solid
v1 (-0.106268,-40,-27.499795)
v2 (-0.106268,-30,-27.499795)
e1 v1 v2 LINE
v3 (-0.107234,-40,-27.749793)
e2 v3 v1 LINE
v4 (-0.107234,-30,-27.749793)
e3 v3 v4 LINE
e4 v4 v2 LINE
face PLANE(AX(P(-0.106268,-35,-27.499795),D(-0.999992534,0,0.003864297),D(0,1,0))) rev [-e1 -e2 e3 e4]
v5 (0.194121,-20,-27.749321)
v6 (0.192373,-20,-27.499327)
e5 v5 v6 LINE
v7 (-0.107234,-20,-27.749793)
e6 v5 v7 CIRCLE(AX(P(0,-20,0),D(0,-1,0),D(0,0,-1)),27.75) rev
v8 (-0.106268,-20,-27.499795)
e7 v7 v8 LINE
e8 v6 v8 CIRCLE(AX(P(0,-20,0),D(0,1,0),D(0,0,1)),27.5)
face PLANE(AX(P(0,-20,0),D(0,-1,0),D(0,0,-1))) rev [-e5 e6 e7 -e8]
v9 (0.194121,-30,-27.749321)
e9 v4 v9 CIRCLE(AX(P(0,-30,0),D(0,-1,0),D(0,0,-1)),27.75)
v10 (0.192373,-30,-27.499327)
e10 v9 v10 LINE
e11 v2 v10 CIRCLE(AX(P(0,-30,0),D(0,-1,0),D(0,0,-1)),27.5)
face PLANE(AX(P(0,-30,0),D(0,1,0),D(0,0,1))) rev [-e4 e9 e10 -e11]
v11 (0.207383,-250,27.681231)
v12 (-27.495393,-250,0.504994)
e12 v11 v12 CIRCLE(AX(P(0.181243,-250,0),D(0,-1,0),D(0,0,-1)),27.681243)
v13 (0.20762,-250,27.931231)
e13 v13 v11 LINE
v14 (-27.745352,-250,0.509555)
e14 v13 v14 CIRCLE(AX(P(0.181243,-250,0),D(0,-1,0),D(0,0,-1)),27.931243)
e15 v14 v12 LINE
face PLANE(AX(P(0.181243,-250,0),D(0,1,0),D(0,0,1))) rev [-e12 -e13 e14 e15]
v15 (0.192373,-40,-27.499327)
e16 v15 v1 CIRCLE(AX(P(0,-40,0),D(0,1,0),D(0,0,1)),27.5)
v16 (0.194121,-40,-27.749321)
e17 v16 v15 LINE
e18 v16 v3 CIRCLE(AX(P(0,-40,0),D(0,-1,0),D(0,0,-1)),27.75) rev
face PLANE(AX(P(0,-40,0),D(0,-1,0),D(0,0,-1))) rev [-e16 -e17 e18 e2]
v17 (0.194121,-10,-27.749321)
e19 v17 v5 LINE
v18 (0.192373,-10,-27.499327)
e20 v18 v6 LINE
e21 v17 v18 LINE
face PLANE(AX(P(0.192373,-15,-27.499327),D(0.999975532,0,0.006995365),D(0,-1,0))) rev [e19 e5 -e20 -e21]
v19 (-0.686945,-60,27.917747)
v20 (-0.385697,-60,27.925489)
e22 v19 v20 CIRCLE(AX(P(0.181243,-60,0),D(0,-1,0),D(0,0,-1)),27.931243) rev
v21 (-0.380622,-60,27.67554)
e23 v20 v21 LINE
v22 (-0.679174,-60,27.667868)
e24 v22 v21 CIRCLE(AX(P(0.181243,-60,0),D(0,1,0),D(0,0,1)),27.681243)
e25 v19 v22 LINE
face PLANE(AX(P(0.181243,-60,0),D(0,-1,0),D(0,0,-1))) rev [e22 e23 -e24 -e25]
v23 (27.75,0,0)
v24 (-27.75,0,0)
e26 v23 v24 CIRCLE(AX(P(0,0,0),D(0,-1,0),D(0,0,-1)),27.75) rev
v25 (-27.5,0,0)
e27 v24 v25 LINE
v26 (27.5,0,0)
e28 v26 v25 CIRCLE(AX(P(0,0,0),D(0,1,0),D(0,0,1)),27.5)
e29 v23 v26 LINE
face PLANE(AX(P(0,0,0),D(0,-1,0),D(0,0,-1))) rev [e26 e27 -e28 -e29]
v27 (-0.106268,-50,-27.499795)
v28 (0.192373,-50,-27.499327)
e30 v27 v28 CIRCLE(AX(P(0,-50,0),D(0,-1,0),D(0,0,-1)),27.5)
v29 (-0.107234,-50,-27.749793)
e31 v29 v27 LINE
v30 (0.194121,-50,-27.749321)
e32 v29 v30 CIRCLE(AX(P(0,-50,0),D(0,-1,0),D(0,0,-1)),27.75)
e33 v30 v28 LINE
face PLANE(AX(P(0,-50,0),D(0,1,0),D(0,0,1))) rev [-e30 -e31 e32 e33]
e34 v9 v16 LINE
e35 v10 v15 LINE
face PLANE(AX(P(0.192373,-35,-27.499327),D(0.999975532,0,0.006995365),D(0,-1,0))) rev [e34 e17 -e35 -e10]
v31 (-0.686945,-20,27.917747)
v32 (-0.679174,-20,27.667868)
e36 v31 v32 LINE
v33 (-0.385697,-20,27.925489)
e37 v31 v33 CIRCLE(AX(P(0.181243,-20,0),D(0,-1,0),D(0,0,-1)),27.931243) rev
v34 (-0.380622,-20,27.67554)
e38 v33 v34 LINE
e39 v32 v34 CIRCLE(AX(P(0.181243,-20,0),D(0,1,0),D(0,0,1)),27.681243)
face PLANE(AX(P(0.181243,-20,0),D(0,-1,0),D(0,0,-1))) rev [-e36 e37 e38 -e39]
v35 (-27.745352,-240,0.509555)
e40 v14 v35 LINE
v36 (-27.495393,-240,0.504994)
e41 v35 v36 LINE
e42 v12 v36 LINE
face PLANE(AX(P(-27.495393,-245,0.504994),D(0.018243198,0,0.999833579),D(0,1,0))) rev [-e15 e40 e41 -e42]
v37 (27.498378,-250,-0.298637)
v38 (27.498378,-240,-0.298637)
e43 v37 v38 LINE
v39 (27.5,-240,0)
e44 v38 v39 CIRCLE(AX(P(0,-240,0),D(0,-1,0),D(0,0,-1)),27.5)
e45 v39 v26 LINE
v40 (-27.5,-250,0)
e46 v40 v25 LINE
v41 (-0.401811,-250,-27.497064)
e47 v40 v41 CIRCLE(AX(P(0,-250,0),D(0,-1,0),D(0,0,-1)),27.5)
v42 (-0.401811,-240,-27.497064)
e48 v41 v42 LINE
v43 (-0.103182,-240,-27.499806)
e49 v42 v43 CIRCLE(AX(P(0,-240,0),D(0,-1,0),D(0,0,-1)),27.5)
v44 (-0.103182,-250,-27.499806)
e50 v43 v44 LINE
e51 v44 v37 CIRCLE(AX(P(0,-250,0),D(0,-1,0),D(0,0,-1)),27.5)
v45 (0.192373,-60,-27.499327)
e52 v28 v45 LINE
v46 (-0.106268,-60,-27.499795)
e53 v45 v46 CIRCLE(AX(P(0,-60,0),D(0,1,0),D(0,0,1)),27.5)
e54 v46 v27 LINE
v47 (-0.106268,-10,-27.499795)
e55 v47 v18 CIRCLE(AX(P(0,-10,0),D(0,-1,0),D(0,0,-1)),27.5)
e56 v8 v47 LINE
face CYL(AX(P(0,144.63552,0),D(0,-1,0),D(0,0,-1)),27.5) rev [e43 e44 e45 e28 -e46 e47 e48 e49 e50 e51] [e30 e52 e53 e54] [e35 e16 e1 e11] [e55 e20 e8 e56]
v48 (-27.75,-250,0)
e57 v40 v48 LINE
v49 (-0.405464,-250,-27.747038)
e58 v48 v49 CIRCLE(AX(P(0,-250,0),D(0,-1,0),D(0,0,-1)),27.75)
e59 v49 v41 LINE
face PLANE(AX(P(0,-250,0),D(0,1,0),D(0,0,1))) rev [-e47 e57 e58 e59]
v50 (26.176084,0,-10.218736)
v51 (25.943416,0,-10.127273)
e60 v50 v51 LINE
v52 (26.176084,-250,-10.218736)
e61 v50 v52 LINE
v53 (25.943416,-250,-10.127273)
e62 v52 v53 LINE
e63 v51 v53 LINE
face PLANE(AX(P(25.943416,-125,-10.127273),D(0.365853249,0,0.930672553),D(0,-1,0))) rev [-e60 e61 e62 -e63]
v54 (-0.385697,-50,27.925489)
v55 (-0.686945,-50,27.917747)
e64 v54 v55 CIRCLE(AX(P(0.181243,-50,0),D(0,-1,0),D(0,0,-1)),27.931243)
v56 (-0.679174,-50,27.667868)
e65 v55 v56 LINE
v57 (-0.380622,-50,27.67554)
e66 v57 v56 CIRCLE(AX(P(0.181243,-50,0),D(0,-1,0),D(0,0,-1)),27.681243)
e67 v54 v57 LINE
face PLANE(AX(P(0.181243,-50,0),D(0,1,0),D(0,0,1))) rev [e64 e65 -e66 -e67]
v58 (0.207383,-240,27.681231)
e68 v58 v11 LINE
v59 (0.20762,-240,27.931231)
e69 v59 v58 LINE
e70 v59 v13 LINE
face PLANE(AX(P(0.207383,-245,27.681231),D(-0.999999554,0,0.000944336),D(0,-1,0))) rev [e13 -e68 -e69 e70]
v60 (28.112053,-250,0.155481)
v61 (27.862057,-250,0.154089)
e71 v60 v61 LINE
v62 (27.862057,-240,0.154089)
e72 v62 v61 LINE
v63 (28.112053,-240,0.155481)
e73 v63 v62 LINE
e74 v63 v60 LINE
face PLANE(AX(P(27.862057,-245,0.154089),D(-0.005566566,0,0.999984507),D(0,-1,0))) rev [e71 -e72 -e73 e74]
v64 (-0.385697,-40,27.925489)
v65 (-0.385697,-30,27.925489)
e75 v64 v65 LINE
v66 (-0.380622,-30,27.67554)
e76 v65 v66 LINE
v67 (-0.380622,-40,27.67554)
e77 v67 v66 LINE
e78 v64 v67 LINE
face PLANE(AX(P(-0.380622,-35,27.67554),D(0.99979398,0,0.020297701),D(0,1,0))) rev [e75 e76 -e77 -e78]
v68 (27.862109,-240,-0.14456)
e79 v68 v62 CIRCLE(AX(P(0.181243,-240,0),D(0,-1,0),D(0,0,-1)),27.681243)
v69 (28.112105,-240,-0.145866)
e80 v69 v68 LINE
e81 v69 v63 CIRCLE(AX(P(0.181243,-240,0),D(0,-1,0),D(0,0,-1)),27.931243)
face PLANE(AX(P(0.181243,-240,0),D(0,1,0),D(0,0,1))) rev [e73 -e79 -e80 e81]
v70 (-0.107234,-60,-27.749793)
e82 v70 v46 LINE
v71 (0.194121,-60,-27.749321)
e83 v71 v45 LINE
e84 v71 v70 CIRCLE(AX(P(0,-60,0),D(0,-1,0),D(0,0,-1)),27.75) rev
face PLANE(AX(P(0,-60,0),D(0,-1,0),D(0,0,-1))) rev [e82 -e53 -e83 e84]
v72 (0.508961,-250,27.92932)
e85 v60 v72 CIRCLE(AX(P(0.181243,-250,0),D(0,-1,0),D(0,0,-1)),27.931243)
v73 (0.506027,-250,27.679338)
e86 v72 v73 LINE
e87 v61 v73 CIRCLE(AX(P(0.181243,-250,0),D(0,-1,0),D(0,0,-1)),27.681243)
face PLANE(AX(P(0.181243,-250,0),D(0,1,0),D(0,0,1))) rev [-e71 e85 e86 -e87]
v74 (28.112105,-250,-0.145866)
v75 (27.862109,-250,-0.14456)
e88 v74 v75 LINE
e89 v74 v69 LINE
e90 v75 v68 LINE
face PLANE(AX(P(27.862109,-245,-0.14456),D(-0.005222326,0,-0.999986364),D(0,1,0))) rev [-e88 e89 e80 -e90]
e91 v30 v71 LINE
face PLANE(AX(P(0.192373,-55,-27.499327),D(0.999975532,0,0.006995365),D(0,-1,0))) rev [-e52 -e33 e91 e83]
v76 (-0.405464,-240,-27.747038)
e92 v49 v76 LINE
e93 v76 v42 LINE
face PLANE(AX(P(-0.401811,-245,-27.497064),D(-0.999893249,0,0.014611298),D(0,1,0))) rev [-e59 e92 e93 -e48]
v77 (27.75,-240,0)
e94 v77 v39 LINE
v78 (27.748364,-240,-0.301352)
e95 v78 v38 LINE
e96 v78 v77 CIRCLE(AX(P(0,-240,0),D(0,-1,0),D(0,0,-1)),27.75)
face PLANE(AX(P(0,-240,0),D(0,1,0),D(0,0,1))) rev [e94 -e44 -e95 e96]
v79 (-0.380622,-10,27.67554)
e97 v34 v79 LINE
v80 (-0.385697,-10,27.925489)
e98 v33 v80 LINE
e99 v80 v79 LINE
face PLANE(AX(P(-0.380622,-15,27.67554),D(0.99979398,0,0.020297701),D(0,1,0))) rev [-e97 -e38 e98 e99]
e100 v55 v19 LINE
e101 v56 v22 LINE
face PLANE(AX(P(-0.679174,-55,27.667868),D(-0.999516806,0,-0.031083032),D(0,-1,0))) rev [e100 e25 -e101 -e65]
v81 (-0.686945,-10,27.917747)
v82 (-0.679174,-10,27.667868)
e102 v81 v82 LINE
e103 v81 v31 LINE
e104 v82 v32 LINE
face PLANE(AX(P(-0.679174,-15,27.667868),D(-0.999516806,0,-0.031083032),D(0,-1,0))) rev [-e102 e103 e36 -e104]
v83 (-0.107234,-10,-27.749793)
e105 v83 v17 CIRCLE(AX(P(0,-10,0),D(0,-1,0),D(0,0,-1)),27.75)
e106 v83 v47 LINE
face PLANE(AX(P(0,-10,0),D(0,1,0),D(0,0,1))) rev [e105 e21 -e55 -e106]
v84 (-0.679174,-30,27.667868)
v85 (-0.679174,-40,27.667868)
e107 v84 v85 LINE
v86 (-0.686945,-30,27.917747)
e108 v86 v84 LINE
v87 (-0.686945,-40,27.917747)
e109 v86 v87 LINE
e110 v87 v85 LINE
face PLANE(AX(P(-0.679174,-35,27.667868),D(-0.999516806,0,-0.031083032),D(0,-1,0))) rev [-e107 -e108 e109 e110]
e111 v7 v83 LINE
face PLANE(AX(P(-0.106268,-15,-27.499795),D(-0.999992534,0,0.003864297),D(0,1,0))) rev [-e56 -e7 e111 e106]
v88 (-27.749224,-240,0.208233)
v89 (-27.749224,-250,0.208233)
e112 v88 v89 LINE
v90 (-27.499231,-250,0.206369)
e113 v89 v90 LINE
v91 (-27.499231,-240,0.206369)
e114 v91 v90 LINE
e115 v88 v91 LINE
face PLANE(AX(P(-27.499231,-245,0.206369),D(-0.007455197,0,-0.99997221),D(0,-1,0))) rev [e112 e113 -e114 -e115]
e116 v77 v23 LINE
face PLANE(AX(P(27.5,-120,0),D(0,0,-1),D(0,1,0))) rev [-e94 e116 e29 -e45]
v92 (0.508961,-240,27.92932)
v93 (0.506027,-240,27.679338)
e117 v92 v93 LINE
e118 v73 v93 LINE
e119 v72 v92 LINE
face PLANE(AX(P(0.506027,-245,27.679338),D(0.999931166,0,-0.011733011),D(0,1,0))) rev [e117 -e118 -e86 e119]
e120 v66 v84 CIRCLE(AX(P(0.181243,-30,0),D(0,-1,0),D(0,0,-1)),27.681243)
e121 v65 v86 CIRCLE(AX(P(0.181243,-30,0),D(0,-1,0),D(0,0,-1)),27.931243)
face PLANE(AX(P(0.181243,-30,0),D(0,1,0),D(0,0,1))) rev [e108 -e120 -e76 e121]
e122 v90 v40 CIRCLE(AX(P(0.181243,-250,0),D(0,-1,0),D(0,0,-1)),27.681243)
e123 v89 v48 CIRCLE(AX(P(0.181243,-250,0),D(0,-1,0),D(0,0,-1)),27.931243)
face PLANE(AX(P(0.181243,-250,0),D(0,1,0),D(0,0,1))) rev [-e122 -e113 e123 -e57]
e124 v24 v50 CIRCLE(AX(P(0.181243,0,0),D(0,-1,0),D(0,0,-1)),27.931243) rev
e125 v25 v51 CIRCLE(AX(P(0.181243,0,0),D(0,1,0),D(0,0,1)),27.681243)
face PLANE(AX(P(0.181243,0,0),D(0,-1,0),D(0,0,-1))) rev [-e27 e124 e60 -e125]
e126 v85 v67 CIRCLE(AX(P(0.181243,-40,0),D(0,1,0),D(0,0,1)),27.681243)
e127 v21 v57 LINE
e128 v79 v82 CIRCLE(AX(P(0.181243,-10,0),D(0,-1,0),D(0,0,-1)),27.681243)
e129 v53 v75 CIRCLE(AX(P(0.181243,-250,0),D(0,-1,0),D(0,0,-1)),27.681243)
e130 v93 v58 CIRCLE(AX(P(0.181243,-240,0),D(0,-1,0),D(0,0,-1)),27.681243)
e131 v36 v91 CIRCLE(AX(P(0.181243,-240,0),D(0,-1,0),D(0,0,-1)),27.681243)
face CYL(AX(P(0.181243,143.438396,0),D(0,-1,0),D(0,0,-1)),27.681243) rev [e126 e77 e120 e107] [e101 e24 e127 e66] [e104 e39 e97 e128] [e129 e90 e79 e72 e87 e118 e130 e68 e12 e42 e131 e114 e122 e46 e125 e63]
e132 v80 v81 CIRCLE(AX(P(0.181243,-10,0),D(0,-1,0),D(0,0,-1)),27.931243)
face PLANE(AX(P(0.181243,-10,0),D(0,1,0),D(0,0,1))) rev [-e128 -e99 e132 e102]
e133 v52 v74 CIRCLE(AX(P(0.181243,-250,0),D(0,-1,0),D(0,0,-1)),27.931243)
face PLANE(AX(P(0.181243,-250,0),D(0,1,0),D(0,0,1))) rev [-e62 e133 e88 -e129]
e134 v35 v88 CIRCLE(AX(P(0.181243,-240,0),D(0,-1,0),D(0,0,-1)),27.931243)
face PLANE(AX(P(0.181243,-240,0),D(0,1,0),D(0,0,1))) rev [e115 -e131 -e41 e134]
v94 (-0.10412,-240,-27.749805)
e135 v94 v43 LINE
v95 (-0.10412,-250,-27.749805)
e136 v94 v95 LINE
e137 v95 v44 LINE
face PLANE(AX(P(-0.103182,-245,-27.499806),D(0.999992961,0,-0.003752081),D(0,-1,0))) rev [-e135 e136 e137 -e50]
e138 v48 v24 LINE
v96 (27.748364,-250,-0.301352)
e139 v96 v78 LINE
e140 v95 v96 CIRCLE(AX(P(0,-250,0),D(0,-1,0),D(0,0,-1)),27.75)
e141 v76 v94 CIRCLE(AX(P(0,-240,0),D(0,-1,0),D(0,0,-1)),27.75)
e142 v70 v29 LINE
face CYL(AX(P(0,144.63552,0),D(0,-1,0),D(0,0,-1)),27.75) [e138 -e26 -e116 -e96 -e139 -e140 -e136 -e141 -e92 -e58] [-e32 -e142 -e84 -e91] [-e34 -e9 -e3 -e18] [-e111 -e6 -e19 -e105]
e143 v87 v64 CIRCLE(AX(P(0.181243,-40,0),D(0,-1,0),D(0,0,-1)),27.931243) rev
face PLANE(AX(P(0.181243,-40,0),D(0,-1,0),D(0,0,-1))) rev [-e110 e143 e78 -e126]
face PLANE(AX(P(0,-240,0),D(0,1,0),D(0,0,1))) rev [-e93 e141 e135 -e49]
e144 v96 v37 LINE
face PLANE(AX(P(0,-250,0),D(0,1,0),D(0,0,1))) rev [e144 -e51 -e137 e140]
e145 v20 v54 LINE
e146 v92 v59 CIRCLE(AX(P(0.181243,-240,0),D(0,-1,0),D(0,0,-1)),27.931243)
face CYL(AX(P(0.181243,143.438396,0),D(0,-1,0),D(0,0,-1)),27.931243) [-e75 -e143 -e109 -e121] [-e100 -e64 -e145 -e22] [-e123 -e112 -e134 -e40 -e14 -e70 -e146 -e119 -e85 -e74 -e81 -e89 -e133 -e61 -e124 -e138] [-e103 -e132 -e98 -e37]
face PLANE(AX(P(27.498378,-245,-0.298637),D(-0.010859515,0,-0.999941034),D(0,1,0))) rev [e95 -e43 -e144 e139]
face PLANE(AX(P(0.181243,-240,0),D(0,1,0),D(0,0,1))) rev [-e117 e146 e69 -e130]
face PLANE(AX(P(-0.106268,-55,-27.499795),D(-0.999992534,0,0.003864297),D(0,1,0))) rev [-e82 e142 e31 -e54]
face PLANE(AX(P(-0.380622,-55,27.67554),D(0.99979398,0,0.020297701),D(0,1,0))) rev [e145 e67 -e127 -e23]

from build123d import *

# Parameters (mm, degrees)
BASE_FLANGE1_DEPTH   = 250
UNFOLD1_START        = -250
UNFOLD1_DEPTH        = 250
UNFOLD1_2_DEPTH      = 250
SKETCH6_W            = 0.3
SKETCH6_H            = 10
CUT_EXTRUDE1_DEPTH   = 311.743338181
LPATTERN1_COUNT      = 2
LPATTERN1_PITCH      = 86.4
LPATTERN1_COUNT_DIR2 = 3
LPATTERN1_PITCH_DIR2 = 20
SKETCH7_W            = 0.3
SKETCH7_H            = 10
CUT_EXTRUDE2_DEPTH   = 311.743338181
LPATTERN2_COUNT      = 5
LPATTERN2_PITCH      = 43.4969
FOLD1_START          = -250
FOLD1_DEPTH          = 250
FOLD1_2_DEPTH        = 10
FOLD1_3_DEPTH        = 250
FOLD1_START_2        = -240
FOLD1_4_DEPTH        = 180
FOLD1_START_3        = -60
FOLD1_5_DEPTH        = 60
FOLD1_START_4        = -50
FOLD1_6_DEPTH        = 10
FOLD1_START_5        = -30
FOLD1_7_DEPTH        = 10
FOLD1_START_6        = -10
FOLD1_8_DEPTH        = 10
FOLD1_9_DEPTH        = 10


# Read off the part's stored shape, not the designer's step: Unfold1, Fold1
# Sheet-metal steps are written as plain solids
with BuildPart() as part:
    # Sketch1 → Base-Flange1 (new body)
    with BuildSketch(Plane(origin=(0, 0, 0), x_dir=(1, 0, 0), z_dir=(0, 1, 0))):
        with BuildLine():
            ThreePointArc((27.5, 0), (0, 27.5), (-27.5, 0))
            ThreePointArc((-27.5, 0), (5.334991298, -27.197244319), (25.943416257, 10.127272727))
            Line((25.943416257, 10.127272727), (26.176084396, 10.21873604))
            ThreePointArc((26.176084396, 10.21873604), (5.381536789, -27.442873139), (-27.75, 0))
            ThreePointArc((-27.75, 0), (0, 27.75), (27.75, 0))
            Line((27.75, 0), (27.5, 0))
        make_face()
    extrude(amount=-BASE_FLANGE1_DEPTH)

    # Unfold1 outline → Unfold1 (cut)
    with BuildSketch(Plane(origin=(0, 0, 0), x_dir=(1, 0, 0), z_dir=(0, 1, 0)).offset(UNFOLD1_START)):
        with BuildLine():
            Line((27.5, 4.465057679), (27.5, 5.81720394))
            ThreePointArc((27.5, 5.81720394), (26.928734746, 8.045248964), (26.176084396, 10.21873604))
            Line((26.176084396, 10.21873604), (25.943416257, 10.127272727))
            ThreePointArc((25.943416257, 10.127272727), (26.872280055, 7.337558511), (27.5, 4.465057679))
        make_face()
        with BuildLine():
            ThreePointArc((-27.75, 0), (2.431208617, -27.840474058), (27.75, 4.485307483))
            Line((27.75, 4.485307483), (27.75, 2.492962419))
            ThreePointArc((27.75, 2.492962419), (1.428992542, -27.653107247), (-27.5, 0))
            ThreePointArc((-27.5, 0), (0, 27.5), (27.5, 0))
            Line((27.5, 0), (27.5, 3.716517187))
            ThreePointArc((27.5, 3.716517187), (-1.862458053, 27.687429458), (-27.75, 0))
        make_face()
    extrude(amount=UNFOLD1_DEPTH, mode=Mode.SUBTRACT)

    # Unfold1 2 outline → Unfold1 2 (add)
    with BuildSketch(Plane(origin=(0, 0, 0), x_dir=(1, 0, 0), z_dir=(0, 1, 0)).offset(UNFOLD1_START)):
        with BuildLine():
            Line((27.5, 184.557199058), (27.5, 5.81720394))
            ThreePointArc((27.5, 5.81720394), (27.633078737, 5.152772109), (27.75, 4.485307483))
            Line((27.75, 4.485307483), (27.75, 184.557199058))
            Line((27.75, 184.557199058), (27.5, 184.557199058))
        make_face()
        with BuildLine():
            ThreePointArc((27.75, 2.492962419), (27.642708515, 3.481254935), (27.5, 4.465057679))
            Line((27.5, 4.465057679), (27.5, 3.716517187))
            ThreePointArc((27.5, 3.716517187), (27.687429458, 1.862458053), (27.75, 0))
            Line((27.75, 0), (27.75, 2.492962419))
        make_face()
    extrude(amount=UNFOLD1_2_DEPTH)

    # Sketch6 → Cut-Extrude1 (cut, through all)
    with BuildSketch(Plane(origin=(27.75, 0, 0), x_dir=(0, 0, -1), z_dir=(1, 0, 0))):
        with Locations((43.35, -15)):
            Rectangle(SKETCH6_W, SKETCH6_H)
    cut_extrude1 = extrude(amount=-CUT_EXTRUDE1_DEPTH, mode=Mode.SUBTRACT)

    # LPattern1: Cut-Extrude1 2 × 3
    with Locations(*[(0, -j * LPATTERN1_PITCH_DIR2, -i * LPATTERN1_PITCH) for i in range(LPATTERN1_COUNT) for j in range(LPATTERN1_COUNT_DIR2) if (i, j) != (0, 0)]):
        add(cut_extrude1, mode=Mode.SUBTRACT)

    # Sketch7 → Cut-Extrude2 (cut, through all)
    with BuildSketch(Plane(origin=(27.75, 0, 0), x_dir=(0, 0, -1), z_dir=(1, 0, 0))):
        with Locations((0.15, -245)):
            Rectangle(SKETCH7_W, SKETCH7_H)
    cut_extrude2 = extrude(amount=-CUT_EXTRUDE2_DEPTH, mode=Mode.SUBTRACT)

    # LPattern2: Cut-Extrude2 ×5
    with Locations(*[(0, 0, -i * LPATTERN2_PITCH) for i in range(1, LPATTERN2_COUNT)]):
        add(cut_extrude2, mode=Mode.SUBTRACT)

    # Fold1 outline → Fold1 (cut)
    with BuildSketch(Plane(origin=(0, 0, 0), x_dir=(1, 0, 0), z_dir=(0, 1, 0)).offset(FOLD1_START)):
        with BuildLine():
            Line((27.5, 4.465057679), (27.5, 3.716517187))
            ThreePointArc((27.5, 3.716517187), (27.687429458, 1.862458053), (27.75, 0))
            Line((27.75, 0), (27.75, 2.492962419))
            ThreePointArc((27.75, 2.492962419), (27.642708515, 3.481254935), (27.5, 4.465057679))
        make_face()
        with BuildLine():
            ThreePointArc((27.5, 5.81720394), (27.633078737, 5.152772109), (27.75, 4.485307483))
            Line((27.75, 4.485307483), (27.75, 184.557199058))
            Line((27.75, 184.557199058), (27.5, 184.557199058))
            Line((27.5, 184.557199058), (27.5, 5.81720394))
        make_face()
    extrude(amount=FOLD1_DEPTH, mode=Mode.SUBTRACT)

    # Fold1 2 outline → Fold1 2 (cut)
    with BuildSketch(Plane(origin=(0, 0, 0), x_dir=(1, 0, 0), z_dir=(0, 1, 0)).offset(FOLD1_START)):
        with BuildLine():
            ThreePointArc((27.748378331, 0.3), (27.748371017, 0.300675772), (27.748363686, 0.301351543))
            Line((27.748363686, 0.301351543), (27.623914005, 0.3))
            Line((27.623914005, 0.3), (27.748378331, 0.3))
        make_face()
    extrude(amount=FOLD1_2_DEPTH, mode=Mode.SUBTRACT)

    # Fold1 3 outline → Fold1 3 (add)
    with BuildSketch(Plane(origin=(0, 0, 0), x_dir=(1, 0, 0), z_dir=(0, 1, 0)).offset(FOLD1_START)):
        with BuildLine():
            Line((0.194121372, 27.749321017), (0.192372531, 27.499327134))
            ThreePointArc((0.192372531, 27.499327134), (19.407828644, 19.482971727), (27.498378428, 0.298636664))
            Line((27.498378428, 0.298636664), (27.623914005, 0.3))
            Line((27.623914005, 0.3), (27.5, 0.3))
            Line((27.5, 0.3), (27.5, 3.716517187))
            ThreePointArc((27.5, 3.716517187), (18.333984963, 20.830926417), (0.194121372, 27.749321017))
        make_face()
        with BuildLine():
            ThreePointArc((25.943416257, 10.127272727), (26.872280055, 7.337558511), (27.5, 4.465057679))
            Line((27.5, 4.465057679), (27.5, 5.81720394))
            ThreePointArc((27.5, 5.81720394), (26.928734746, 8.045248964), (26.176084396, 10.21873604))
            Line((26.176084396, 10.21873604), (25.943416257, 10.127272727))
        make_face()
        with BuildLine():
            ThreePointArc((-27.5, 0), (-19.586982848, 19.302852196), (-0.401810697, 27.497064355))
            Line((-0.401810697, 27.497064355), (-0.405463521, 27.747037668))
            ThreePointArc((-0.405463521, 27.747037668), (-19.765046328, 19.478332671), (-27.75, 0))
            ThreePointArc((-27.75, 0), (-27.749805944, -0.104117185), (-27.74922378, -0.208232924))
            Line((-27.74922378, -0.208232924), (-27.499230728, -0.206369125))
            ThreePointArc((-27.499230728, -0.206369125), (-27.499807681, -0.103185279), (-27.5, 0))
        make_face()
        with BuildLine():
            Line((27.75, 4.485307483), (27.75, 2.492962419))
            ThreePointArc((27.75, 2.492962419), (27.830997978, 1.319952212), (27.86210871, 0.144560473))
            Line((27.86210871, 0.144560473), (28.112105301, 0.145866054))
            ThreePointArc((28.112105301, 0.145866054), (28.015747193, 2.322654117), (27.75, 4.485307483))
        make_face()
        with BuildLine():
            Line((28.112053433, -0.155481098), (27.862057305, -0.154089457))
            ThreePointArc((27.862057305, -0.154089457), (19.815096757, -19.513149653), (0.506027414, -27.679337678))
            Line((0.506027414, -27.679337678), (0.508960666, -27.929320469))
            ThreePointArc((0.508960666, -27.929320469), (19.992417674, -19.689380446), (28.112053433, -0.155481098))
        make_face()
        with BuildLine():
            ThreePointArc((-0.67917386, -27.667867677), (-19.517647079, -19.447492002), (-27.49539326, -0.504994403))
            Line((-27.49539326, -0.504994403), (-27.745351655, -0.509555202))
            ThreePointArc((-27.745351655, -0.509555202), (-19.695555366, -19.623129815), (-0.686944618, -27.917746878))
            Line((-0.686944618, -27.917746878), (-0.67917386, -27.667867677))
        make_face()
        with BuildLine():
            Line((0.207619564, -27.931230638), (0.20738348, -27.681230749))
            ThreePointArc((0.20738348, -27.681230749), (-0.08663462, -27.679946905), (-0.380622499, -27.675540215))
            Line((-0.380622499, -27.675540215), (-0.385696924, -27.92548871))
            ThreePointArc((-0.385696924, -27.92548871), (-0.089053927, -27.929935198), (0.207619564, -27.931230638))
        make_face()
    extrude(amount=FOLD1_3_DEPTH)

    # Fold1 4 outline → Fold1 4 (add)
    with BuildSketch(Plane(origin=(0, 0, 0), x_dir=(1, 0, 0), z_dir=(0, 1, 0)).offset(FOLD1_START_2)):
        with BuildLine():
            Line((0.192372531, 27.499327134), (0.194121372, 27.749321017))
            ThreePointArc((0.194121372, 27.749321017), (-0.105677242, 27.74979878), (-0.405463521, 27.747037668))
            Line((-0.405463521, 27.747037668), (-0.401810697, 27.497064355))
            ThreePointArc((-0.401810697, 27.497064355), (-0.104725195, 27.499800593), (0.192372531, 27.499327134))
        make_face()
        with BuildLine():
            Line((27.5, 0.298654275), (27.498378428, 0.298636664))
            ThreePointArc((27.498378428, 0.298636664), (27.499594604, 0.149320533), (27.5, 0))
            Line((27.5, 0), (27.5, 0.298654275))
        make_face()
        with BuildLine():
            Line((28.112105301, 0.145866054), (27.86210871, 0.144560473))
            ThreePointArc((27.86210871, 0.144560473), (27.862485773, -0.004764561), (27.862057305, -0.154089457))
            Line((27.862057305, -0.154089457), (28.112053433, -0.155481098))
            ThreePointArc((28.112053433, -0.155481098), (28.11248577, -0.004807592), (28.112105301, 0.145866054))
        make_face()
        with BuildLine():
            ThreePointArc((-27.49539326, -0.504994403), (-27.497714727, -0.355686939), (-27.499230728, -0.206369125))
            Line((-27.499230728, -0.206369125), (-27.74922378, -0.208232924))
            ThreePointArc((-27.74922378, -0.208232924), (-27.747694087, -0.358899285), (-27.745351655, -0.509555202))
            Line((-27.745351655, -0.509555202), (-27.49539326, -0.504994403))
        make_face()
        with BuildLine():
            Line((0.508960666, -27.929320469), (0.506027414, -27.679337678))
            ThreePointArc((0.506027414, -27.679337678), (0.356708, -27.680686971), (0.20738348, -27.681230749))
            Line((0.20738348, -27.681230749), (0.207619564, -27.931230638))
            ThreePointArc((0.207619564, -27.931230638), (0.358292691, -27.930681948), (0.508960666, -27.929320469))
        make_face()
        with BuildLine():
            ThreePointArc((-0.380622499, -27.675540215), (-0.529908527, -27.672106579), (-0.67917386, -27.667867677))
            Line((-0.67917386, -27.667867677), (-0.686944618, -27.917746878))
            ThreePointArc((-0.686944618, -27.917746878), (-0.536331212, -27.922024063), (-0.385696924, -27.92548871))
            Line((-0.385696924, -27.92548871), (-0.380622499, -27.675540215))
        make_face()
    extrude(amount=FOLD1_4_DEPTH)

    # Fold1 5 outline → Fold1 5 (add)
    with BuildSketch(Plane(origin=(0, 0, 0), x_dir=(1, 0, 0), z_dir=(0, 1, 0)).offset(FOLD1_START_3)):
        with BuildLine():
            Line((27.5, 0.298654275), (27.498378428, 0.298636664))
            ThreePointArc((27.498378428, 0.298636664), (27.499594604, 0.149320533), (27.5, 0))
            Line((27.5, 0), (27.5, 0.298654275))
        make_face()
        with BuildLine():
            ThreePointArc((-0.401810697, 27.497064355), (-0.254043101, 27.498826559), (-0.106268169, 27.499794673))
            Line((-0.106268169, 27.499794673), (-0.107234244, 27.749792807))
            ThreePointArc((-0.107234244, 27.749792807), (-0.256352584, 27.748815891), (-0.405463521, 27.747037668))
            Line((-0.405463521, 27.747037668), (-0.401810697, 27.497064355))
        make_face()
        with BuildLine():
            Line((28.112105301, 0.145866054), (27.86210871, 0.144560473))
            ThreePointArc((27.86210871, 0.144560473), (27.862485773, -0.004764561), (27.862057305, -0.154089457))
            Line((27.862057305, -0.154089457), (28.112053433, -0.155481098))
            ThreePointArc((28.112053433, -0.155481098), (28.11248577, -0.004807592), (28.112105301, 0.145866054))
        make_face()
        with BuildLine():
            ThreePointArc((-27.49539326, -0.504994403), (-27.497714727, -0.355686939), (-27.499230728, -0.206369125))
            Line((-27.499230728, -0.206369125), (-27.74922378, -0.208232924))
            ThreePointArc((-27.74922378, -0.208232924), (-27.747694087, -0.358899285), (-27.745351655, -0.509555202))
            Line((-27.745351655, -0.509555202), (-27.49539326, -0.504994403))
        make_face()
        with BuildLine():
            Line((0.508960666, -27.929320469), (0.506027414, -27.679337678))
            ThreePointArc((0.506027414, -27.679337678), (0.356708, -27.680686971), (0.20738348, -27.681230749))
            Line((0.20738348, -27.681230749), (0.207619564, -27.931230638))
            ThreePointArc((0.207619564, -27.931230638), (0.358292691, -27.930681948), (0.508960666, -27.929320469))
        make_face()
    extrude(amount=FOLD1_5_DEPTH)

    # Fold1 6 outline → Fold1 6 (add)
    with BuildSketch(Plane(origin=(0, 0, 0), x_dir=(1, 0, 0), z_dir=(0, 1, 0)).offset(FOLD1_START_4)):
        with BuildLine():
            Line((0.192372531, 27.499327134), (0.194121372, 27.749321017))
            ThreePointArc((0.194121372, 27.749321017), (0.043444204, 27.749965993), (-0.107234244, 27.749792807))
            Line((-0.107234244, 27.749792807), (-0.106268169, 27.499794673))
            ThreePointArc((-0.106268169, 27.499794673), (0.043052816, 27.499966299), (0.192372531, 27.499327134))
        make_face()
        with BuildLine():
            ThreePointArc((-0.380622499, -27.675540215), (-0.529908527, -27.672106579), (-0.67917386, -27.667867677))
            Line((-0.67917386, -27.667867677), (-0.686944618, -27.917746878))
            ThreePointArc((-0.686944618, -27.917746878), (-0.536331212, -27.922024063), (-0.385696924, -27.92548871))
            Line((-0.385696924, -27.92548871), (-0.380622499, -27.675540215))
        make_face()
    extrude(amount=FOLD1_6_DEPTH)

    # Fold1 7 outline → Fold1 7 (add)
    with BuildSketch(Plane(origin=(0, 0, 0), x_dir=(1, 0, 0), z_dir=(0, 1, 0)).offset(FOLD1_START_5)):
        with BuildLine():
            Line((0.192372531, 27.499327134), (0.194121372, 27.749321017))
            ThreePointArc((0.194121372, 27.749321017), (0.043444204, 27.749965993), (-0.107234244, 27.749792807))
            Line((-0.107234244, 27.749792807), (-0.106268169, 27.499794673))
            ThreePointArc((-0.106268169, 27.499794673), (0.043052816, 27.499966299), (0.192372531, 27.499327134))
        make_face()
        with BuildLine():
            ThreePointArc((-0.380622499, -27.675540215), (-0.529908527, -27.672106579), (-0.67917386, -27.667867677))
            Line((-0.67917386, -27.667867677), (-0.686944618, -27.917746878))
            ThreePointArc((-0.686944618, -27.917746878), (-0.536331212, -27.922024063), (-0.385696924, -27.92548871))
            Line((-0.385696924, -27.92548871), (-0.380622499, -27.675540215))
        make_face()
    extrude(amount=FOLD1_7_DEPTH)

    # Fold1 8 outline → Fold1 8 (add)
    with BuildSketch(Plane(origin=(0, 0, 0), x_dir=(1, 0, 0), z_dir=(0, 1, 0)).offset(FOLD1_START_6)):
        with BuildLine():
            Line((0.192372531, 27.499327134), (0.194121372, 27.749321017))
            ThreePointArc((0.194121372, 27.749321017), (0.043444204, 27.749965993), (-0.107234244, 27.749792807))
            Line((-0.107234244, 27.749792807), (-0.106268169, 27.499794673))
            ThreePointArc((-0.106268169, 27.499794673), (0.043052816, 27.499966299), (0.192372531, 27.499327134))
        make_face()
        with BuildLine():
            ThreePointArc((-0.380622499, -27.675540215), (-0.529908527, -27.672106579), (-0.67917386, -27.667867677))
            Line((-0.67917386, -27.667867677), (-0.686944618, -27.917746878))
            ThreePointArc((-0.686944618, -27.917746878), (-0.536331212, -27.922024063), (-0.385696924, -27.92548871))
            Line((-0.385696924, -27.92548871), (-0.380622499, -27.675540215))
        make_face()
    extrude(amount=FOLD1_8_DEPTH)

    # Fold1 9 outline → Fold1 9 (add)
    with BuildSketch(Plane(origin=(0, 0, 0), x_dir=(1, 0, 0), z_dir=(0, 1, 0)).offset(FOLD1_START)):
        with BuildLine():
            ThreePointArc((-0.103182219, 27.499806425), (0.0445958, 27.49996384), (0.192372531, 27.499327134))
            Line((0.192372531, 27.499327134), (0.194121372, 27.749321017))
            ThreePointArc((0.194121372, 27.749321017), (0.045001216, 27.749963512), (-0.104120239, 27.749804666))
            Line((-0.104120239, 27.749804666), (-0.103182219, 27.499806425))
        make_face()
        with BuildLine():
            ThreePointArc((-0.380622499, -27.675540215), (-0.529908527, -27.672106579), (-0.67917386, -27.667867677))
            Line((-0.67917386, -27.667867677), (-0.686944618, -27.917746878))
            ThreePointArc((-0.686944618, -27.917746878), (-0.536331212, -27.922024063), (-0.385696924, -27.92548871))
            Line((-0.385696924, -27.92548871), (-0.380622499, -27.675540215))
        make_face()
    extrude(amount=FOLD1_9_DEPTH)


solid = part.part
